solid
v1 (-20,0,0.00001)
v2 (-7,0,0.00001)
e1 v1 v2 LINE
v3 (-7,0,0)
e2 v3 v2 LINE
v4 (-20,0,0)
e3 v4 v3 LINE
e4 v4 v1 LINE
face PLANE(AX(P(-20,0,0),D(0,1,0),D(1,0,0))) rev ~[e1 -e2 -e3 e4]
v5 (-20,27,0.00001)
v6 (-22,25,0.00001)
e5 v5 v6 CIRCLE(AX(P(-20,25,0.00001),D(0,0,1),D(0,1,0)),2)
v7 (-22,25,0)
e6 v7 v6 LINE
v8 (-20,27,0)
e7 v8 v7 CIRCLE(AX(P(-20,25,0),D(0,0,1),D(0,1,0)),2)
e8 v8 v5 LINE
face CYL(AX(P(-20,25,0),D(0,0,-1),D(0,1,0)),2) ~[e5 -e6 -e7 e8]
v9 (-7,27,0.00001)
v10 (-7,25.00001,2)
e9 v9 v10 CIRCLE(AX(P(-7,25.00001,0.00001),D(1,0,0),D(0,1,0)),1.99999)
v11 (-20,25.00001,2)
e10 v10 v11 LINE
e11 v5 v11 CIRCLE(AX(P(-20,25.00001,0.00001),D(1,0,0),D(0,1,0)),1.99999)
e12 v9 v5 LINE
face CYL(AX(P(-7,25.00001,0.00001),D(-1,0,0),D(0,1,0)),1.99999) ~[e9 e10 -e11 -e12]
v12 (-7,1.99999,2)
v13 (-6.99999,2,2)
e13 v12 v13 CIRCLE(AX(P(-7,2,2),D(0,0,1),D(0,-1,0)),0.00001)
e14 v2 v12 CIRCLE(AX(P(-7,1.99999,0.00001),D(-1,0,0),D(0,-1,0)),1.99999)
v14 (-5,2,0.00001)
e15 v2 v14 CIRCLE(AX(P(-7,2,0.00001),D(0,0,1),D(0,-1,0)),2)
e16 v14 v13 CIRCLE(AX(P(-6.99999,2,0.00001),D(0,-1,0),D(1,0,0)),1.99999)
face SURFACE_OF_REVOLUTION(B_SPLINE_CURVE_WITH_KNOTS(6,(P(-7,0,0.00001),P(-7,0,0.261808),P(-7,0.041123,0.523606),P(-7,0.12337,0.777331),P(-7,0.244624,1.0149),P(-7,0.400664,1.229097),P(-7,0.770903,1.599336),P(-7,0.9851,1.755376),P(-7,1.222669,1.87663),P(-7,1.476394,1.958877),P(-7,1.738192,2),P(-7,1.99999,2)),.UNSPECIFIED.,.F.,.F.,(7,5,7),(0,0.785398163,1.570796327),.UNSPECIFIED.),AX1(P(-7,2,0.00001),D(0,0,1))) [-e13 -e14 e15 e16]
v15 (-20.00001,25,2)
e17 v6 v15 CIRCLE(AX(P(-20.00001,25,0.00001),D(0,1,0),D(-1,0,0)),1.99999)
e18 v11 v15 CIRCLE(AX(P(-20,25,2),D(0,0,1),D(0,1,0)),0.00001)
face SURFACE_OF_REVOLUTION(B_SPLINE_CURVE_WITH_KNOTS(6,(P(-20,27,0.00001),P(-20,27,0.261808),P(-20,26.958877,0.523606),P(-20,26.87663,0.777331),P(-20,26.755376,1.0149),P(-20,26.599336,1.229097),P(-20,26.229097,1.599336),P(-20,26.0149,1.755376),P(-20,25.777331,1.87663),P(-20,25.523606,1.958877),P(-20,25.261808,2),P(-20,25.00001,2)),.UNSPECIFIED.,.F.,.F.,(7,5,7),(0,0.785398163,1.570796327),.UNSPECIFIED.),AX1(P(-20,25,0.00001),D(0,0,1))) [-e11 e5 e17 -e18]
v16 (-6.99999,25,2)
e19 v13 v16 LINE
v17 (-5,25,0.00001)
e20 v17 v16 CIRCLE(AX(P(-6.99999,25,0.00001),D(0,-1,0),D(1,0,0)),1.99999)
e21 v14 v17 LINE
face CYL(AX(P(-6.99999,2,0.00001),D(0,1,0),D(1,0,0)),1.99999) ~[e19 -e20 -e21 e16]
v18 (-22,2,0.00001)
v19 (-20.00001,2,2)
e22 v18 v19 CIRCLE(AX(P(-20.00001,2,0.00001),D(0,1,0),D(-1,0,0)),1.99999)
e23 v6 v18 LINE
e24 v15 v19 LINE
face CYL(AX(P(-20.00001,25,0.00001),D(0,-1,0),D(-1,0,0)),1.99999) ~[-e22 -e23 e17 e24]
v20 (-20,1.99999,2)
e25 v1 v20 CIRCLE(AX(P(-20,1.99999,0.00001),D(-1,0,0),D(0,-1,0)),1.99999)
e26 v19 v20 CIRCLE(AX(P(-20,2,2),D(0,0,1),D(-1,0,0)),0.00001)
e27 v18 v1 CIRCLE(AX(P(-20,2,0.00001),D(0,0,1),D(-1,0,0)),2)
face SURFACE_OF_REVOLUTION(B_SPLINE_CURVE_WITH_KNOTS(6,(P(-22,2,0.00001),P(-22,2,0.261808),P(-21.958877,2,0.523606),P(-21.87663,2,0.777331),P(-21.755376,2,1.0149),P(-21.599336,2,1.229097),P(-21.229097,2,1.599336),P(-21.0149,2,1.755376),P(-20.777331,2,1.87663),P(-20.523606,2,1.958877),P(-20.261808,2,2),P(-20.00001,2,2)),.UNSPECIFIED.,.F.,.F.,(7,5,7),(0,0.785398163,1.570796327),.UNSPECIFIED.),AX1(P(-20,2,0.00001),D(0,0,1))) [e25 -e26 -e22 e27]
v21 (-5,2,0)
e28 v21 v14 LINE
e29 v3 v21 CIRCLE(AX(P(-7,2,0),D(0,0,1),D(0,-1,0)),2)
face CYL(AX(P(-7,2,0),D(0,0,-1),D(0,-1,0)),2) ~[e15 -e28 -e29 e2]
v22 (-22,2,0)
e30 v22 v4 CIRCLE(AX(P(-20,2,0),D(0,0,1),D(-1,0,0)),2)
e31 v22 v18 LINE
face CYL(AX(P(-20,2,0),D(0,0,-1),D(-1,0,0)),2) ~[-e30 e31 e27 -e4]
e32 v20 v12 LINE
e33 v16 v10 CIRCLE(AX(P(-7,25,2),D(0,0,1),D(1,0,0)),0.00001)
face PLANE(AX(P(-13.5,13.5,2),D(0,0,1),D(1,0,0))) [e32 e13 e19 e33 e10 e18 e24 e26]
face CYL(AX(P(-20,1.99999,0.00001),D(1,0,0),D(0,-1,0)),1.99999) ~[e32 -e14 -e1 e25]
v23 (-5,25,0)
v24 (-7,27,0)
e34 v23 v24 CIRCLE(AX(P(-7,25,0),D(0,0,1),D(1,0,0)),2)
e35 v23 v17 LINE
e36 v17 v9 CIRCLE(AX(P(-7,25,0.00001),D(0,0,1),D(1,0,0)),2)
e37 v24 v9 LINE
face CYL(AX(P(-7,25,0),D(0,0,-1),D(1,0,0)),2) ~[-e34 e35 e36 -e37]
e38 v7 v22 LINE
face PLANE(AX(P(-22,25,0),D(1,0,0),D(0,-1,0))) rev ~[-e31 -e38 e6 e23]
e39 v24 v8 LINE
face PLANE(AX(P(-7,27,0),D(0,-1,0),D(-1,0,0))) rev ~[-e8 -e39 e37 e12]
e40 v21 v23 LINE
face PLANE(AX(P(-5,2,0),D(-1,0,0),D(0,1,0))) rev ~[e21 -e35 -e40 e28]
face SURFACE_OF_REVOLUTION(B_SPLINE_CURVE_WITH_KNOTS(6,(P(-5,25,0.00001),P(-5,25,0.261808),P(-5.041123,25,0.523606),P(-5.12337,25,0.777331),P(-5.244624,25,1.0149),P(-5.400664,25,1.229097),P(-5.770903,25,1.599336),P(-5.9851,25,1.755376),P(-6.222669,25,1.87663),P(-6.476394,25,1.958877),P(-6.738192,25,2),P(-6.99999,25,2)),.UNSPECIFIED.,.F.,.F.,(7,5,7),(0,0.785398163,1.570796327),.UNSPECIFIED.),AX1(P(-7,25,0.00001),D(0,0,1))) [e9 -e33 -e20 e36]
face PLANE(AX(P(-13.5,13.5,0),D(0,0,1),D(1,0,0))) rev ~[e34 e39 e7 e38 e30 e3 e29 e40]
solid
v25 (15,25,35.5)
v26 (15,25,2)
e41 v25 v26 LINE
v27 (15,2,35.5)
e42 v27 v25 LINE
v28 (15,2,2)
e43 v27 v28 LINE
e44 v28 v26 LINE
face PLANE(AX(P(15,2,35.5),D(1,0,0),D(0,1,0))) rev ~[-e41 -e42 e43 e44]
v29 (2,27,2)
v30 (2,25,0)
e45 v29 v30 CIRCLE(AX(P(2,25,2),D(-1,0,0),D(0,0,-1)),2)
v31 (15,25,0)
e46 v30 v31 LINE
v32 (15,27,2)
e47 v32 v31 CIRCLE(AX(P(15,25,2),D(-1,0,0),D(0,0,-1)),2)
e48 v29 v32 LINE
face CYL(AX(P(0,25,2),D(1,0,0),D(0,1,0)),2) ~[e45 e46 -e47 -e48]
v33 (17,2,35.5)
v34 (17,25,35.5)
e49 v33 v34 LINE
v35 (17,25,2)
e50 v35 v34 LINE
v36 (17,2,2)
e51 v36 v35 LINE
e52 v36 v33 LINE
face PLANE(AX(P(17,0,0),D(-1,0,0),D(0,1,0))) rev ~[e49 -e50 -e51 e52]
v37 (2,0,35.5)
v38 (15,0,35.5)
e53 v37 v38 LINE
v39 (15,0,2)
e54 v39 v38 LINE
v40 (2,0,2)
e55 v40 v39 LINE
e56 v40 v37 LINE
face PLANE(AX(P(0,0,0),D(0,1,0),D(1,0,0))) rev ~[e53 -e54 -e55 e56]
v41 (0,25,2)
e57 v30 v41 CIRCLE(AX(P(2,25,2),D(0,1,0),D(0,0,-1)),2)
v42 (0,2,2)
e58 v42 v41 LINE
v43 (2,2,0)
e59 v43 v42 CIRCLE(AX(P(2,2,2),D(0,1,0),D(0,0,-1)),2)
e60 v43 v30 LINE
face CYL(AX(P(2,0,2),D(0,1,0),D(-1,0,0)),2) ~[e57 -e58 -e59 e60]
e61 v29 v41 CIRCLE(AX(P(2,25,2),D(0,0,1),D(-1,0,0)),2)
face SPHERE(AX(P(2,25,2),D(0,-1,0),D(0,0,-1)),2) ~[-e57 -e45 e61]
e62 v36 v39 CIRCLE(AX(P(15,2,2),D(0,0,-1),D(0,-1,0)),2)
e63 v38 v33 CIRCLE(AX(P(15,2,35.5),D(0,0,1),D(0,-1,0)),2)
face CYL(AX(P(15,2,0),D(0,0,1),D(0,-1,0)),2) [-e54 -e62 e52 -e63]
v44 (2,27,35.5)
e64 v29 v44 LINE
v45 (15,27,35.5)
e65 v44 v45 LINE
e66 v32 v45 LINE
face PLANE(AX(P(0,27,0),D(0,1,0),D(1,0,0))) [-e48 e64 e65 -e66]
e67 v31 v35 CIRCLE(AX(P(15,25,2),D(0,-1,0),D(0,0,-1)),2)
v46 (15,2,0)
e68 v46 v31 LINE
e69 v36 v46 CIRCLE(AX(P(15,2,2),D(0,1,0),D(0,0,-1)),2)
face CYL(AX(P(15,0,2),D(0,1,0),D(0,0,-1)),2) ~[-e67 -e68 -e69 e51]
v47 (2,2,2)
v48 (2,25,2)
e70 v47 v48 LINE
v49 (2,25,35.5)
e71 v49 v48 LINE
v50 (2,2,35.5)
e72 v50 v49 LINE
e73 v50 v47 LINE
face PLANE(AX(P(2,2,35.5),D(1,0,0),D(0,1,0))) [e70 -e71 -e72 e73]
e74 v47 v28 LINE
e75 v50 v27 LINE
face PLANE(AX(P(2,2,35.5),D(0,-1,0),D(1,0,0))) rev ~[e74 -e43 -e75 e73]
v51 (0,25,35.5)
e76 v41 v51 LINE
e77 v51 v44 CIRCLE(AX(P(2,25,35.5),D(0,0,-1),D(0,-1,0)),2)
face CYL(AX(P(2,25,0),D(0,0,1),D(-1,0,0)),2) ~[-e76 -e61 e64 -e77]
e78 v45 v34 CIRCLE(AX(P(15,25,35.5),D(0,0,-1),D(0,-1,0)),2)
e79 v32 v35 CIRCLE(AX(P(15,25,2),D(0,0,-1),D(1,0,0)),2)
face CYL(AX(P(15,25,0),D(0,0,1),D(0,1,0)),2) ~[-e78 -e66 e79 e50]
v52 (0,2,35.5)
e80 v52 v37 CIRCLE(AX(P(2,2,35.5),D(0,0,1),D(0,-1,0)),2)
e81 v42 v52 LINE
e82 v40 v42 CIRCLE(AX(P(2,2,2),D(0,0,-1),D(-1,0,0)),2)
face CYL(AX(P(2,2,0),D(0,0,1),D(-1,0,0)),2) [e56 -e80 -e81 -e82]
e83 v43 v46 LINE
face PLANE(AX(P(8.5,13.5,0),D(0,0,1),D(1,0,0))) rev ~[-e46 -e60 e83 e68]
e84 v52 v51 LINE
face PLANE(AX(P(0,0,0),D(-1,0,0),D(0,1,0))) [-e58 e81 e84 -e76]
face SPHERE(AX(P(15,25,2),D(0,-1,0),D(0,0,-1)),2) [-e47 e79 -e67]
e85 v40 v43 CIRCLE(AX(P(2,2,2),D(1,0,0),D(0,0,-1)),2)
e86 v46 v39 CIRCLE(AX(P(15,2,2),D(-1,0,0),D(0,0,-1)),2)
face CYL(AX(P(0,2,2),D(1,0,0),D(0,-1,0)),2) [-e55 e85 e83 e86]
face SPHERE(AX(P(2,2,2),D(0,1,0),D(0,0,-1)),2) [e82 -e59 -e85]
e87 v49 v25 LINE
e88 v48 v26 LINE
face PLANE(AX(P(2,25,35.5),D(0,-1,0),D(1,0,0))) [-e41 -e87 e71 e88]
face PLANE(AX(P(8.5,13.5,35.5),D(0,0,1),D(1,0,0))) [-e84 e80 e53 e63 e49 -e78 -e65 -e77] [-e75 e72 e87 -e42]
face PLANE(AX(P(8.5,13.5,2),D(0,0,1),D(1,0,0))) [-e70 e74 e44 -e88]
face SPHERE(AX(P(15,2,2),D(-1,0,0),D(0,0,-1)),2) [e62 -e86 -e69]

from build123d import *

# Parameters (mm, degrees)
F0_W     = 17
F0_H     = 27
F1_DEPTH = 35.5
F2_W     = 13
F2_H     = 23
F3_DEPTH = 33.5
F4_R     = 2
F6_DEPTH = 2
F7_R     = 1.99999


# Not quite as in the source:
# - a fillet or chamfer is up to 0.001 mm smaller than in the source, because OpenCascade refuses the exact size


with BuildPart() as f1:
    # F0 (on Top) → F1 (new body)
    with BuildSketch(Plane.XY):
        with Locations((8.5, 13.5)):
            Rectangle(F0_W, F0_H)
    extrude(amount=F1_DEPTH)

    # F2 (on face) → F3 (cut)
    with BuildSketch(Plane.XY.offset(35.5)):
        with Locations((8.5, 13.5)):
            Rectangle(F2_W, F2_H)
    extrude(amount=-F3_DEPTH, mode=Mode.SUBTRACT)

    # F4
    f4_edges = [f1.edges().sort_by_distance(p)[0] for p in [
        (0, 13.5, 0),
        (8.5, 0, 0),
        (17, 13.5, 0),
        (8.5, 27, 0),
        (17, 0, 17.75),
        (0, 0, 17.75),
        (17, 27, 17.75),
        (0, 27, 17.75),
    ]]
    fillet(f4_edges, radius=F4_R)


with BuildPart() as f6:
    # F5 (on Top) → F6 (new body)
    with BuildSketch(Plane.XY):
        with BuildLine():
            Line((-20, 0), (-7, 0))
            ThreePointArc((-7, 0), (-5.5857864376, 0.5857864376), (-5, 2))
            Line((-5, 2), (-5, 25))
            ThreePointArc((-5, 25), (-5.5857864376, 26.4142135624), (-7, 27))
            Line((-7, 27), (-20, 27))
            ThreePointArc((-20, 27), (-21.4142135624, 26.4142135624), (-22, 25))
            Line((-22, 25), (-22, 2))
            ThreePointArc((-22, 2), (-21.4142135624, 0.5857864376), (-20, 0))
        make_face()
    extrude(amount=F6_DEPTH)

    # F7 (radius 2 in the source; OpenCascade refuses exactly that, so slightly less here)
    f7_edges = [f6.edges().sort_by_distance(p)[0] for p in [
        (-13.5, 0, 2),
        (-5.585786, 0.585786, 2),
        (-5, 13.5, 2),
        (-5.585786, 26.414214, 2),
        (-13.5, 27, 2),
        (-21.414214, 26.414214, 2),
        (-22, 13.5, 2),
        (-21.414214, 0.585786, 2),
    ]]
    fillet(f7_edges, radius=F7_R)


solid = Compound([f1.part, f6.part])
